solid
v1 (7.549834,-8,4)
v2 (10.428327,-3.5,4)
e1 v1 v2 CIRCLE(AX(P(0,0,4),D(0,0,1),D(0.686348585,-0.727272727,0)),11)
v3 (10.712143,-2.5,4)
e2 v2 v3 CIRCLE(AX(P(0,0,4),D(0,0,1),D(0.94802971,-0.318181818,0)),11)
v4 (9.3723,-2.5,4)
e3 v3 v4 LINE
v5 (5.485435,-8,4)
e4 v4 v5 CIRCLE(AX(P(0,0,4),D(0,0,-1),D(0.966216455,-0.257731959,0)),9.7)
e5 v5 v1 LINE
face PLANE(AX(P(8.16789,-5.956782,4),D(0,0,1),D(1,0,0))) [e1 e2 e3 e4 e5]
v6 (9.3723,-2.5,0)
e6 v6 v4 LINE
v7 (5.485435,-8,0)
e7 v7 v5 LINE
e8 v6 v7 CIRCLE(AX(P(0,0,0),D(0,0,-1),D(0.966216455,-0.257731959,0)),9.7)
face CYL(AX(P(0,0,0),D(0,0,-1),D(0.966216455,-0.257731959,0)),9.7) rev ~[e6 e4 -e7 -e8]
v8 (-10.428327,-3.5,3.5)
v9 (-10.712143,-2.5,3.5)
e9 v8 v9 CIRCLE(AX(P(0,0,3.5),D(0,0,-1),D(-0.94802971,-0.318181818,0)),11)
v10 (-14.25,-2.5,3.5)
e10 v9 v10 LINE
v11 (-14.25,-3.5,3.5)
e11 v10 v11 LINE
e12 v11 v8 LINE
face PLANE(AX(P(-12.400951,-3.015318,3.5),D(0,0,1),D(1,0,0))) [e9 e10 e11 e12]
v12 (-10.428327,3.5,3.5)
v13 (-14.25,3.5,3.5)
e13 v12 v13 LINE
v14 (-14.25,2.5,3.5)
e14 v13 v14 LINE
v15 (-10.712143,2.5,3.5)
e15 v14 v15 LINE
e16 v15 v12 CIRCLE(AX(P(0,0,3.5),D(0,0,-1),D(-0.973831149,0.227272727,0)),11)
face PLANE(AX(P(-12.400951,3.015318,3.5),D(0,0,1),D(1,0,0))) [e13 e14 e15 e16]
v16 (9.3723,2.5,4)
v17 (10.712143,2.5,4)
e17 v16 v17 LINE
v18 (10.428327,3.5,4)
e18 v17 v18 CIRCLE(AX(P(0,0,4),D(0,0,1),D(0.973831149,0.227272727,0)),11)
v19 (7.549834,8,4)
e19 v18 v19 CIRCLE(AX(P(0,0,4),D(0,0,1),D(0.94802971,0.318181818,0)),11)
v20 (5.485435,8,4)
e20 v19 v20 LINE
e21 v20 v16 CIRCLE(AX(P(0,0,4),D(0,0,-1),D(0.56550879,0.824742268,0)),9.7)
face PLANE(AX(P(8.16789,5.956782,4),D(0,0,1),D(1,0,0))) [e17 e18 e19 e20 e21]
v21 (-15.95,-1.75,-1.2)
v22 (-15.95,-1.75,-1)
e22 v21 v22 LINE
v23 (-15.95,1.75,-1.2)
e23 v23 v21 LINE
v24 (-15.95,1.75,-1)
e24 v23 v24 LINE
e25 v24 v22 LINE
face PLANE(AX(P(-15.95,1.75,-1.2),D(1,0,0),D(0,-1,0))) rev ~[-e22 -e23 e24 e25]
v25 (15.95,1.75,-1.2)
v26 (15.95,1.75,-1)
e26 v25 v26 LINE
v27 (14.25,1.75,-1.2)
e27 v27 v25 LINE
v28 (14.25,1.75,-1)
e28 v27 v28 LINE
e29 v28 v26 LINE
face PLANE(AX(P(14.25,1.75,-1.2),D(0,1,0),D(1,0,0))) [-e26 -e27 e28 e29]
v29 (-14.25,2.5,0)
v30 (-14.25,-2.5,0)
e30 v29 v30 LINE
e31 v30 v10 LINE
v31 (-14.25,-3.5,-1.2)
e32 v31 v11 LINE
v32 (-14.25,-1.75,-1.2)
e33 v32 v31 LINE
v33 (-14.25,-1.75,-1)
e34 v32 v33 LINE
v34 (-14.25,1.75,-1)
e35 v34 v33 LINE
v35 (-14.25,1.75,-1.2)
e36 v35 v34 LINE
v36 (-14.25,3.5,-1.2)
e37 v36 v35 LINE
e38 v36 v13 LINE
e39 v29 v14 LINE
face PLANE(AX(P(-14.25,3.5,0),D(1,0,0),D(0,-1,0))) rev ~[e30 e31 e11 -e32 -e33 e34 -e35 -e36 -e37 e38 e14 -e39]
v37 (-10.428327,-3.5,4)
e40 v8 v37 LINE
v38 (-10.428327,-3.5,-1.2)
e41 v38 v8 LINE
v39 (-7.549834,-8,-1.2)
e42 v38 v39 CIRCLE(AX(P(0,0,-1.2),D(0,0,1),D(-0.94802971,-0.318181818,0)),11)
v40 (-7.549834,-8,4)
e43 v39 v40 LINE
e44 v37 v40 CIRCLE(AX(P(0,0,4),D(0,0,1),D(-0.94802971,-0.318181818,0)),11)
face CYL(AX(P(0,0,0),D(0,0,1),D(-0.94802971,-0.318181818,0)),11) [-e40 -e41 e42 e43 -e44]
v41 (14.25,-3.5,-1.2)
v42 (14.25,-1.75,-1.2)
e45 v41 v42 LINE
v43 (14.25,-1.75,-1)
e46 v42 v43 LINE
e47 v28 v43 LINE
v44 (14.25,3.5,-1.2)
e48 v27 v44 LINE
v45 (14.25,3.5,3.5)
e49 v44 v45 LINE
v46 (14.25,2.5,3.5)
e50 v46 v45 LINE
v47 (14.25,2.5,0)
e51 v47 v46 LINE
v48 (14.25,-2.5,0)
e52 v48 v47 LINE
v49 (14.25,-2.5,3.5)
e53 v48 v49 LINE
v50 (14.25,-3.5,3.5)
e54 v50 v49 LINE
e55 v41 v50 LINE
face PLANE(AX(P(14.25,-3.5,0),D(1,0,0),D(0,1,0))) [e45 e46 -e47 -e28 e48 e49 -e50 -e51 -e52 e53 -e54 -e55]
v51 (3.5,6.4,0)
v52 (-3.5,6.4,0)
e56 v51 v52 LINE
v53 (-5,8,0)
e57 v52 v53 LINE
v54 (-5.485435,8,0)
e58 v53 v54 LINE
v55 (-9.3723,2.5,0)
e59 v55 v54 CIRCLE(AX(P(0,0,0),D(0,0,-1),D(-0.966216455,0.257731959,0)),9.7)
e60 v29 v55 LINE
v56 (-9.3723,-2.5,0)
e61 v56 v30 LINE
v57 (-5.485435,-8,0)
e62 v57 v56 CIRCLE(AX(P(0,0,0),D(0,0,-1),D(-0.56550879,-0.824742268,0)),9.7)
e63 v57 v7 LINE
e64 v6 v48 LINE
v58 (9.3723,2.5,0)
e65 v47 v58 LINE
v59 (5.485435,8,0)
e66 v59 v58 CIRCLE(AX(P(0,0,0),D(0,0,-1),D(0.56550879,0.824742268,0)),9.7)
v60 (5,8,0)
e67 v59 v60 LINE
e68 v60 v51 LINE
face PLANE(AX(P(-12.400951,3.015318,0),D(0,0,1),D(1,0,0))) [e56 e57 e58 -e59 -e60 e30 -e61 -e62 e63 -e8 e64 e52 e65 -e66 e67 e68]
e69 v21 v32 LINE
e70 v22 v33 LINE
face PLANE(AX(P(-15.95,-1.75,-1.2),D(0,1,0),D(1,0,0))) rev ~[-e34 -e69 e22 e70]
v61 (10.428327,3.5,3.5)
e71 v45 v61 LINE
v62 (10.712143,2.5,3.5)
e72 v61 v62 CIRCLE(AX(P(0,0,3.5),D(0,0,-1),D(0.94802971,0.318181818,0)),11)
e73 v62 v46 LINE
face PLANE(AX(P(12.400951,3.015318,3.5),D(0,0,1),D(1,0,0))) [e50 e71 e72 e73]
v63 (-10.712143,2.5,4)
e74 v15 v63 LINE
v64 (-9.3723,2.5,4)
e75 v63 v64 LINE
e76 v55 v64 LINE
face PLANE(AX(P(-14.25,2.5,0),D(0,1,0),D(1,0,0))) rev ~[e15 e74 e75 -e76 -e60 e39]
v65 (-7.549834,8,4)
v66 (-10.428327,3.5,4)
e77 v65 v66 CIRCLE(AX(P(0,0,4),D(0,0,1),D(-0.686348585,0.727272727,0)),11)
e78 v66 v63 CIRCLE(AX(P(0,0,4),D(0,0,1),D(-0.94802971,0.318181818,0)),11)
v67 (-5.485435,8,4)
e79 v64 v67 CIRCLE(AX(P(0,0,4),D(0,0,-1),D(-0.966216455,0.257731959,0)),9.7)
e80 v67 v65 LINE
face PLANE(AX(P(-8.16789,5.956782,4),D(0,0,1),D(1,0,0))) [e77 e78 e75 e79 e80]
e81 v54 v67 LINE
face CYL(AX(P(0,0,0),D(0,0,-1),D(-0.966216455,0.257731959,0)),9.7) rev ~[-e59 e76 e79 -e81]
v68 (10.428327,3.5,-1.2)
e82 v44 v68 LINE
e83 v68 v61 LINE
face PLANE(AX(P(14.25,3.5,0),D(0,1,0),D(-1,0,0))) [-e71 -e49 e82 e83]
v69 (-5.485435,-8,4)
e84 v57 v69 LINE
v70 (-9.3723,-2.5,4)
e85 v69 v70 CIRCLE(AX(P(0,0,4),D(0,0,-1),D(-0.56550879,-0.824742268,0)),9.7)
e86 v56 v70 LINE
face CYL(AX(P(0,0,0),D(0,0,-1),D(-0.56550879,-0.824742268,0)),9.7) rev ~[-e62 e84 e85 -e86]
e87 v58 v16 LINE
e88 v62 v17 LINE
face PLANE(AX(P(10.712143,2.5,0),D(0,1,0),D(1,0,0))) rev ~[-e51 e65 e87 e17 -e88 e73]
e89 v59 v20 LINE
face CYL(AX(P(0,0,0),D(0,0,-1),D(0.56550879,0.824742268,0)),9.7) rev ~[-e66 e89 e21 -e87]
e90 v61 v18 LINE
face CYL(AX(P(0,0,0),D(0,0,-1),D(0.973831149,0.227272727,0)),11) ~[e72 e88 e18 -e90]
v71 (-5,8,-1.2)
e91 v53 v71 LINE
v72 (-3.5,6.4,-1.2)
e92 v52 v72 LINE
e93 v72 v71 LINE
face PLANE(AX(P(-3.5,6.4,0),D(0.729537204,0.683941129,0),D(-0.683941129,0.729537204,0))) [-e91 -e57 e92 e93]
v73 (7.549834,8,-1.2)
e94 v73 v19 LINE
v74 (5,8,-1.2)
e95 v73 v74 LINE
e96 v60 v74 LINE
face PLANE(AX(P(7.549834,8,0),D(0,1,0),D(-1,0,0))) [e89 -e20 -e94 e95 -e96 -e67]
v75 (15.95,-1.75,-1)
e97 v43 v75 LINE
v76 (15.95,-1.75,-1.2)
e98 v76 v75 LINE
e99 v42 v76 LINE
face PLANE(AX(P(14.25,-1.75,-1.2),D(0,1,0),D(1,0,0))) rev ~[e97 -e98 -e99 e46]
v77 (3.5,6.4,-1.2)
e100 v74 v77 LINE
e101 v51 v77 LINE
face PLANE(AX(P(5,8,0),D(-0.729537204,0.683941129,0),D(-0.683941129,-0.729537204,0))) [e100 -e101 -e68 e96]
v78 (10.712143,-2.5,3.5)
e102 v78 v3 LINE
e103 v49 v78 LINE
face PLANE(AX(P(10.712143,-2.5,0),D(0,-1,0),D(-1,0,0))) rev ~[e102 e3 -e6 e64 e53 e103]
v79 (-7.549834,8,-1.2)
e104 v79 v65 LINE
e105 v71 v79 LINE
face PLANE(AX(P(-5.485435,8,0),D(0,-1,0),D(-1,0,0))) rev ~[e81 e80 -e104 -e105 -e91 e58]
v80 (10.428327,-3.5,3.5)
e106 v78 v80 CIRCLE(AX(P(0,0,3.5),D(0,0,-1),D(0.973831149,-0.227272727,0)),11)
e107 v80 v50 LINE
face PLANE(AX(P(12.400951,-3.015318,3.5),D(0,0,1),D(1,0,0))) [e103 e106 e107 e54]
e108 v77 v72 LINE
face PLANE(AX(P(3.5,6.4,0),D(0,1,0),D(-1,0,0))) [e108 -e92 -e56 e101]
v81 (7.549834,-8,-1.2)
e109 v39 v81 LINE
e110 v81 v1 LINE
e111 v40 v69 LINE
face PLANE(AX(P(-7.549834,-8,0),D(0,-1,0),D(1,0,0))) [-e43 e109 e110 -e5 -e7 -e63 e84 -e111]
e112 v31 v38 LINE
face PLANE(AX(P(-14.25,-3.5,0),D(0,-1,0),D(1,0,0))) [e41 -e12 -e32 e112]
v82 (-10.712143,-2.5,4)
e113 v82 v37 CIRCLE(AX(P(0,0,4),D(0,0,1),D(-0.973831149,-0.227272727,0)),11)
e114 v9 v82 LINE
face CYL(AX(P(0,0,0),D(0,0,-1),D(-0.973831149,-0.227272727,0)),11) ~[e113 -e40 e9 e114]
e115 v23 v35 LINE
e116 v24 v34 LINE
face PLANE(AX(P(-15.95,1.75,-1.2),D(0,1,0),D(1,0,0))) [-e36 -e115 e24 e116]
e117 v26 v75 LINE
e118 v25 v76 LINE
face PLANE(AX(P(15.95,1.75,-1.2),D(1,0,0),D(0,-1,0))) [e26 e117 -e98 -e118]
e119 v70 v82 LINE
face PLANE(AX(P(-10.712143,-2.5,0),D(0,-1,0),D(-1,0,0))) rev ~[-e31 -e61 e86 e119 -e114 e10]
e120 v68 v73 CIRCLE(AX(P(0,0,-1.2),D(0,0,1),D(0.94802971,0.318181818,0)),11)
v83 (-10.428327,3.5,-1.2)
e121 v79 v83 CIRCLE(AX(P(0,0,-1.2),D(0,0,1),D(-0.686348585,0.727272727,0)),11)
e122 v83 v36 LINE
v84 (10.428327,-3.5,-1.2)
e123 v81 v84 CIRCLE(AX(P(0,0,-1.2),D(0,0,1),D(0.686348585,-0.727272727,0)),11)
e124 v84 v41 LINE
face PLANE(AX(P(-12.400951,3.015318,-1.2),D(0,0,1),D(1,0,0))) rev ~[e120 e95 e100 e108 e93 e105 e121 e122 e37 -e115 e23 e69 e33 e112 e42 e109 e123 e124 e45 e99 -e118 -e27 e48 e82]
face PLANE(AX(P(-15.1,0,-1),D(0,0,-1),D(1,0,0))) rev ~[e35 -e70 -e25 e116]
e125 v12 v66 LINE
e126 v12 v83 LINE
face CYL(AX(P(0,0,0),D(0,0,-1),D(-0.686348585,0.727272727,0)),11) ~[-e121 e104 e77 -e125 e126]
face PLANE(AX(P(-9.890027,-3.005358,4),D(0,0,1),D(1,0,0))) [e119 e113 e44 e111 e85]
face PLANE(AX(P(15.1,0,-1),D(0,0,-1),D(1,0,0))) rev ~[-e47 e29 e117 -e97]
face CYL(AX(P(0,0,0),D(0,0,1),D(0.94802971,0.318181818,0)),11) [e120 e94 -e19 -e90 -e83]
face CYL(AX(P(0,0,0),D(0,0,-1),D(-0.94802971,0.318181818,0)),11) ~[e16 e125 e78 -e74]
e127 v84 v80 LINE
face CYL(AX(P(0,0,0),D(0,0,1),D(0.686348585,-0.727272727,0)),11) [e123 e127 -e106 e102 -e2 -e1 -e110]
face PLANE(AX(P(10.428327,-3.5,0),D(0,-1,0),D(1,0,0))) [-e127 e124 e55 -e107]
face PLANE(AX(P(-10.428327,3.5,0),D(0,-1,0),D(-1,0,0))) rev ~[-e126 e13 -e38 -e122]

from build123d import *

# Parameters (mm, degrees)
F1_DEPTH = 1.2
F2_DEPTH = 4
F3_DEPTH = 3.5
F4_W     = 1.7
F4_H     = 3.5
F5_DEPTH = 0.2


# Not quite as in the source:
# - a feature names something its author has since deleted; it is built from what else it names


with BuildPart() as f1:
    # F0 (on Top) → F1 (new body)
    with BuildSketch(Plane.XY):
        with BuildLine():
            ThreePointArc((-10.7121426428, 2.5), (-10.5820537772, 3.0033544341), (-10.4283268073, 3.5))
            Line((-10.4283268073, 3.5), (-14.25, 3.5))
            Line((-14.25, 3.5), (-14.25, 2.5))
            Line((-14.25, 2.5), (-10.7121426428, 2.5))
        make_face()
        with BuildLine():
            ThreePointArc((-10.4283268073, -3.5), (-10.5820537772, -3.0033544341), (-10.7121426428, -2.5))
            Line((-10.7121426428, -2.5), (-14.25, -2.5))
            Line((-14.25, -2.5), (-14.25, -3.5))
            Line((-14.25, -3.5), (-10.4283268073, -3.5))
        make_face()
        with BuildLine():
            Line((-9.3722996111, -2.5), (-10.7121426428, -2.5))
            ThreePointArc((-10.7121426428, -2.5), (-10.5820537772, -3.0033544341), (-10.4283268073, -3.5))
            Line((-10.4283268073, -3.5), (-9.0465463023, -3.5))
            ThreePointArc((-9.0465463023, -3.5), (-9.2229860238, -3.004418214), (-9.3722996111, -2.5))
        make_face()
        with BuildLine():
            Line((-9.0465463023, 3.5), (-10.4283268073, 3.5))
            ThreePointArc((-10.4283268073, 3.5), (-10.5820537772, 3.0033544341), (-10.7121426428, 2.5))
            Line((-10.7121426428, 2.5), (-9.3722996111, 2.5))
            ThreePointArc((-9.3722996111, 2.5), (-9.2229860238, 3.004418214), (-9.0465463023, 3.5))
        make_face()
        with BuildLine():
            Line((-9.3722996111, 2.5), (-10.7121426428, 2.5))
            ThreePointArc((-10.7121426428, 2.5), (-11, 0), (-10.7121426428, -2.5))
            Line((-10.7121426428, -2.5), (-9.3722996111, -2.5))
            ThreePointArc((-9.3722996111, -2.5), (-9.7, 0), (-9.3722996111, 2.5))
        make_face()
        with BuildLine():
            ThreePointArc((9.0465463023, 3.5), (7.606386924, 6.0193752136), (5.4854352608, 8))
            Line((5.4854352608, 8), (5, 8))
            Line((5, 8), (3.5, 6.4))
            Line((3.5, 6.4), (-3.5, 6.4))
            Line((-3.5, 6.4), (-5, 8))
            Line((-5, 8), (-5.4854352608, 8))
            ThreePointArc((-5.4854352608, 8), (-7.606386924, 6.0193752136), (-9.0465463023, 3.5))
            Line((-9.0465463023, 3.5), (9.0465463023, 3.5))
        make_face()
        with BuildLine():
            ThreePointArc((9.3722996111, 2.5), (9.2229860238, 3.004418214), (9.0465463023, 3.5))
            Line((9.0465463023, 3.5), (-9.0465463023, 3.5))
            ThreePointArc((-9.0465463023, 3.5), (-9.2229860238, 3.004418214), (-9.3722996111, 2.5))
            ThreePointArc((-9.3722996111, 2.5), (-9.7, 0), (-9.3722996111, -2.5))
            ThreePointArc((-9.3722996111, -2.5), (-9.2229860238, -3.004418214), (-9.0465463023, -3.5))
            Line((-9.0465463023, -3.5), (9.0465463023, -3.5))
            ThreePointArc((9.0465463023, -3.5), (9.2229860238, -3.004418214), (9.3722996111, -2.5))
            ThreePointArc((9.3722996111, -2.5), (9.6177259845, -1.2606930182), (9.7, 0))
            ThreePointArc((9.7, 0), (9.6177259845, 1.2606930182), (9.3722996111, 2.5))
        make_face()
        with BuildLine():
            Line((-5.4854352608, 8), (-7.5498344353, 8))
            ThreePointArc((-7.5498344353, 8), (-9.2663946827, 5.9273880912), (-10.4283268073, 3.5))
            Line((-10.4283268073, 3.5), (-9.0465463023, 3.5))
            ThreePointArc((-9.0465463023, 3.5), (-7.606386924, 6.0193752136), (-5.4854352608, 8))
        make_face()
        with BuildLine():
            ThreePointArc((10.4283268073, 3.5), (9.2663946827, 5.9273880912), (7.5498344353, 8))
            Line((7.5498344353, 8), (5.4854352608, 8))
            ThreePointArc((5.4854352608, 8), (7.606386924, 6.0193752136), (9.0465463023, 3.5))
            Line((9.0465463023, 3.5), (10.4283268073, 3.5))
        make_face()
        with BuildLine():
            Line((14.25, 3.5), (10.4283268073, 3.5))
            ThreePointArc((10.4283268073, 3.5), (10.5820537772, 3.0033544341), (10.7121426428, 2.5))
            Line((10.7121426428, 2.5), (14.25, 2.5))
            Line((14.25, 2.5), (14.25, 3.5))
        make_face()
        with BuildLine():
            Line((14.25, -2.5), (10.7121426428, -2.5))
            ThreePointArc((10.7121426428, -2.5), (10.5820537772, -3.0033544341), (10.4283268073, -3.5))
            Line((10.4283268073, -3.5), (14.25, -3.5))
            Line((14.25, -3.5), (14.25, -2.5))
        make_face()
        with BuildLine():
            ThreePointArc((10.4283268073, -3.5), (10.5820537772, -3.0033544341), (10.7121426428, -2.5))
            Line((10.7121426428, -2.5), (9.3722996111, -2.5))
            ThreePointArc((9.3722996111, -2.5), (9.2229860238, -3.004418214), (9.0465463023, -3.5))
            Line((9.0465463023, -3.5), (10.4283268073, -3.5))
        make_face()
        with BuildLine():
            ThreePointArc((11, 0), (10.9277987049, 1.258258902), (10.7121426428, 2.5))
            Line((10.7121426428, 2.5), (9.3722996111, 2.5))
            ThreePointArc((9.3722996111, 2.5), (9.6177259845, 1.2606930182), (9.7, 0))
            ThreePointArc((9.7, 0), (9.6177259845, -1.2606930182), (9.3722996111, -2.5))
            Line((9.3722996111, -2.5), (10.7121426428, -2.5))
            ThreePointArc((10.7121426428, -2.5), (10.9277987049, -1.258258902), (11, 0))
        make_face()
        with BuildLine():
            ThreePointArc((10.7121426428, 2.5), (10.5820537772, 3.0033544341), (10.4283268073, 3.5))
            Line((10.4283268073, 3.5), (9.0465463023, 3.5))
            ThreePointArc((9.0465463023, 3.5), (9.2229860238, 3.004418214), (9.3722996111, 2.5))
            Line((9.3722996111, 2.5), (10.7121426428, 2.5))
        make_face()
        with BuildLine():
            ThreePointArc((7.5498344353, -8), (9.2663946827, -5.9273880912), (10.4283268073, -3.5))
            Line((10.4283268073, -3.5), (9.0465463023, -3.5))
            ThreePointArc((9.0465463023, -3.5), (7.606386924, -6.0193752136), (5.4854352608, -8))
            Line((5.4854352608, -8), (7.5498344353, -8))
        make_face()
        with BuildLine():
            Line((9.0465463023, -3.5), (-9.0465463023, -3.5))
            ThreePointArc((-9.0465463023, -3.5), (-7.606386924, -6.0193752136), (-5.4854352608, -8))
            Line((-5.4854352608, -8), (5.4854352608, -8))
            ThreePointArc((5.4854352608, -8), (7.606386924, -6.0193752136), (9.0465463023, -3.5))
        make_face()
        with BuildLine():
            Line((-9.0465463023, -3.5), (-10.4283268073, -3.5))
            ThreePointArc((-10.4283268073, -3.5), (-9.2663946827, -5.9273880912), (-7.5498344353, -8))
            Line((-7.5498344353, -8), (-5.4854352608, -8))
            ThreePointArc((-5.4854352608, -8), (-7.606386924, -6.0193752136), (-9.0465463023, -3.5))
        make_face()
        with BuildLine():
            ThreePointArc((-10.7121426428, -2.5), (-11, 0), (-10.7121426428, 2.5))
            Line((-10.7121426428, 2.5), (-14.25, 2.5))
            Line((-14.25, 2.5), (-14.25, -2.5))
            Line((-14.25, -2.5), (-10.7121426428, -2.5))
        make_face()
        with BuildLine():
            Line((14.25, 2.5), (10.7121426428, 2.5))
            ThreePointArc((10.7121426428, 2.5), (10.9277987049, 1.258258902), (11, 0))
            ThreePointArc((11, 0), (10.9277987049, -1.258258902), (10.7121426428, -2.5))
            Line((10.7121426428, -2.5), (14.25, -2.5))
            Line((14.25, -2.5), (14.25, 2.5))
        make_face()
    extrude(amount=-F1_DEPTH)

    # F0 (on Top) → F2 (join)
    with BuildSketch(Plane.XY):
        with BuildLine():
            Line((-5.4854352608, 8), (-7.5498344353, 8))
            ThreePointArc((-7.5498344353, 8), (-9.2663946827, 5.9273880912), (-10.4283268073, 3.5))
            Line((-10.4283268073, 3.5), (-9.0465463023, 3.5))
            ThreePointArc((-9.0465463023, 3.5), (-7.606386924, 6.0193752136), (-5.4854352608, 8))
        make_face()
        with BuildLine():
            Line((-9.0465463023, 3.5), (-10.4283268073, 3.5))
            ThreePointArc((-10.4283268073, 3.5), (-10.5820537772, 3.0033544341), (-10.7121426428, 2.5))
            Line((-10.7121426428, 2.5), (-9.3722996111, 2.5))
            ThreePointArc((-9.3722996111, 2.5), (-9.2229860238, 3.004418214), (-9.0465463023, 3.5))
        make_face()
        with BuildLine():
            Line((-9.3722996111, -2.5), (-10.7121426428, -2.5))
            ThreePointArc((-10.7121426428, -2.5), (-10.5820537772, -3.0033544341), (-10.4283268073, -3.5))
            Line((-10.4283268073, -3.5), (-9.0465463023, -3.5))
            ThreePointArc((-9.0465463023, -3.5), (-9.2229860238, -3.004418214), (-9.3722996111, -2.5))
        make_face()
        with BuildLine():
            Line((-9.0465463023, -3.5), (-10.4283268073, -3.5))
            ThreePointArc((-10.4283268073, -3.5), (-9.2663946827, -5.9273880912), (-7.5498344353, -8))
            Line((-7.5498344353, -8), (-5.4854352608, -8))
            ThreePointArc((-5.4854352608, -8), (-7.606386924, -6.0193752136), (-9.0465463023, -3.5))
        make_face()
        with BuildLine():
            ThreePointArc((7.5498344353, -8), (9.2663946827, -5.9273880912), (10.4283268073, -3.5))
            Line((10.4283268073, -3.5), (9.0465463023, -3.5))
            ThreePointArc((9.0465463023, -3.5), (7.606386924, -6.0193752136), (5.4854352608, -8))
            Line((5.4854352608, -8), (7.5498344353, -8))
        make_face()
        with BuildLine():
            ThreePointArc((10.4283268073, -3.5), (10.5820537772, -3.0033544341), (10.7121426428, -2.5))
            Line((10.7121426428, -2.5), (9.3722996111, -2.5))
            ThreePointArc((9.3722996111, -2.5), (9.2229860238, -3.004418214), (9.0465463023, -3.5))
            Line((9.0465463023, -3.5), (10.4283268073, -3.5))
        make_face()
        with BuildLine():
            ThreePointArc((10.4283268073, 3.5), (9.2663946827, 5.9273880912), (7.5498344353, 8))
            Line((7.5498344353, 8), (5.4854352608, 8))
            ThreePointArc((5.4854352608, 8), (7.606386924, 6.0193752136), (9.0465463023, 3.5))
            Line((9.0465463023, 3.5), (10.4283268073, 3.5))
        make_face()
        with BuildLine():
            ThreePointArc((10.7121426428, 2.5), (10.5820537772, 3.0033544341), (10.4283268073, 3.5))
            Line((10.4283268073, 3.5), (9.0465463023, 3.5))
            ThreePointArc((9.0465463023, 3.5), (9.2229860238, 3.004418214), (9.3722996111, 2.5))
            Line((9.3722996111, 2.5), (10.7121426428, 2.5))
        make_face()
    extrude(amount=F2_DEPTH)

    # F0 (on Top) → F3 (join)
    with BuildSketch(Plane.XY):
        with BuildLine():
            ThreePointArc((-10.7121426428, 2.5), (-10.5820537772, 3.0033544341), (-10.4283268073, 3.5))
            Line((-10.4283268073, 3.5), (-14.25, 3.5))
            Line((-14.25, 3.5), (-14.25, 2.5))
            Line((-14.25, 2.5), (-10.7121426428, 2.5))
        make_face()
        with BuildLine():
            ThreePointArc((-10.4283268073, -3.5), (-10.5820537772, -3.0033544341), (-10.7121426428, -2.5))
            Line((-10.7121426428, -2.5), (-14.25, -2.5))
            Line((-14.25, -2.5), (-14.25, -3.5))
            Line((-14.25, -3.5), (-10.4283268073, -3.5))
        make_face()
        with BuildLine():
            Line((14.25, -2.5), (10.7121426428, -2.5))
            ThreePointArc((10.7121426428, -2.5), (10.5820537772, -3.0033544341), (10.4283268073, -3.5))
            Line((10.4283268073, -3.5), (14.25, -3.5))
            Line((14.25, -3.5), (14.25, -2.5))
        make_face()
        with BuildLine():
            Line((14.25, 3.5), (10.4283268073, 3.5))
            ThreePointArc((10.4283268073, 3.5), (10.5820537772, 3.0033544341), (10.7121426428, 2.5))
            Line((10.7121426428, 2.5), (14.25, 2.5))
            Line((14.25, 2.5), (14.25, 3.5))
        make_face()
    extrude(amount=F3_DEPTH)

    # F4 (on face) → F5 (join)
    with BuildSketch(Plane(origin=(0, 0, -1.2), x_dir=(1, 0, 0), z_dir=(0, 0, -1))):
        with Locations((-15.1, 0)):
            Rectangle(F4_W, F4_H)
        with Locations((15.1, 0)):
            Rectangle(F4_W, F4_H)
    extrude(amount=-F5_DEPTH)


solid = f1.part
